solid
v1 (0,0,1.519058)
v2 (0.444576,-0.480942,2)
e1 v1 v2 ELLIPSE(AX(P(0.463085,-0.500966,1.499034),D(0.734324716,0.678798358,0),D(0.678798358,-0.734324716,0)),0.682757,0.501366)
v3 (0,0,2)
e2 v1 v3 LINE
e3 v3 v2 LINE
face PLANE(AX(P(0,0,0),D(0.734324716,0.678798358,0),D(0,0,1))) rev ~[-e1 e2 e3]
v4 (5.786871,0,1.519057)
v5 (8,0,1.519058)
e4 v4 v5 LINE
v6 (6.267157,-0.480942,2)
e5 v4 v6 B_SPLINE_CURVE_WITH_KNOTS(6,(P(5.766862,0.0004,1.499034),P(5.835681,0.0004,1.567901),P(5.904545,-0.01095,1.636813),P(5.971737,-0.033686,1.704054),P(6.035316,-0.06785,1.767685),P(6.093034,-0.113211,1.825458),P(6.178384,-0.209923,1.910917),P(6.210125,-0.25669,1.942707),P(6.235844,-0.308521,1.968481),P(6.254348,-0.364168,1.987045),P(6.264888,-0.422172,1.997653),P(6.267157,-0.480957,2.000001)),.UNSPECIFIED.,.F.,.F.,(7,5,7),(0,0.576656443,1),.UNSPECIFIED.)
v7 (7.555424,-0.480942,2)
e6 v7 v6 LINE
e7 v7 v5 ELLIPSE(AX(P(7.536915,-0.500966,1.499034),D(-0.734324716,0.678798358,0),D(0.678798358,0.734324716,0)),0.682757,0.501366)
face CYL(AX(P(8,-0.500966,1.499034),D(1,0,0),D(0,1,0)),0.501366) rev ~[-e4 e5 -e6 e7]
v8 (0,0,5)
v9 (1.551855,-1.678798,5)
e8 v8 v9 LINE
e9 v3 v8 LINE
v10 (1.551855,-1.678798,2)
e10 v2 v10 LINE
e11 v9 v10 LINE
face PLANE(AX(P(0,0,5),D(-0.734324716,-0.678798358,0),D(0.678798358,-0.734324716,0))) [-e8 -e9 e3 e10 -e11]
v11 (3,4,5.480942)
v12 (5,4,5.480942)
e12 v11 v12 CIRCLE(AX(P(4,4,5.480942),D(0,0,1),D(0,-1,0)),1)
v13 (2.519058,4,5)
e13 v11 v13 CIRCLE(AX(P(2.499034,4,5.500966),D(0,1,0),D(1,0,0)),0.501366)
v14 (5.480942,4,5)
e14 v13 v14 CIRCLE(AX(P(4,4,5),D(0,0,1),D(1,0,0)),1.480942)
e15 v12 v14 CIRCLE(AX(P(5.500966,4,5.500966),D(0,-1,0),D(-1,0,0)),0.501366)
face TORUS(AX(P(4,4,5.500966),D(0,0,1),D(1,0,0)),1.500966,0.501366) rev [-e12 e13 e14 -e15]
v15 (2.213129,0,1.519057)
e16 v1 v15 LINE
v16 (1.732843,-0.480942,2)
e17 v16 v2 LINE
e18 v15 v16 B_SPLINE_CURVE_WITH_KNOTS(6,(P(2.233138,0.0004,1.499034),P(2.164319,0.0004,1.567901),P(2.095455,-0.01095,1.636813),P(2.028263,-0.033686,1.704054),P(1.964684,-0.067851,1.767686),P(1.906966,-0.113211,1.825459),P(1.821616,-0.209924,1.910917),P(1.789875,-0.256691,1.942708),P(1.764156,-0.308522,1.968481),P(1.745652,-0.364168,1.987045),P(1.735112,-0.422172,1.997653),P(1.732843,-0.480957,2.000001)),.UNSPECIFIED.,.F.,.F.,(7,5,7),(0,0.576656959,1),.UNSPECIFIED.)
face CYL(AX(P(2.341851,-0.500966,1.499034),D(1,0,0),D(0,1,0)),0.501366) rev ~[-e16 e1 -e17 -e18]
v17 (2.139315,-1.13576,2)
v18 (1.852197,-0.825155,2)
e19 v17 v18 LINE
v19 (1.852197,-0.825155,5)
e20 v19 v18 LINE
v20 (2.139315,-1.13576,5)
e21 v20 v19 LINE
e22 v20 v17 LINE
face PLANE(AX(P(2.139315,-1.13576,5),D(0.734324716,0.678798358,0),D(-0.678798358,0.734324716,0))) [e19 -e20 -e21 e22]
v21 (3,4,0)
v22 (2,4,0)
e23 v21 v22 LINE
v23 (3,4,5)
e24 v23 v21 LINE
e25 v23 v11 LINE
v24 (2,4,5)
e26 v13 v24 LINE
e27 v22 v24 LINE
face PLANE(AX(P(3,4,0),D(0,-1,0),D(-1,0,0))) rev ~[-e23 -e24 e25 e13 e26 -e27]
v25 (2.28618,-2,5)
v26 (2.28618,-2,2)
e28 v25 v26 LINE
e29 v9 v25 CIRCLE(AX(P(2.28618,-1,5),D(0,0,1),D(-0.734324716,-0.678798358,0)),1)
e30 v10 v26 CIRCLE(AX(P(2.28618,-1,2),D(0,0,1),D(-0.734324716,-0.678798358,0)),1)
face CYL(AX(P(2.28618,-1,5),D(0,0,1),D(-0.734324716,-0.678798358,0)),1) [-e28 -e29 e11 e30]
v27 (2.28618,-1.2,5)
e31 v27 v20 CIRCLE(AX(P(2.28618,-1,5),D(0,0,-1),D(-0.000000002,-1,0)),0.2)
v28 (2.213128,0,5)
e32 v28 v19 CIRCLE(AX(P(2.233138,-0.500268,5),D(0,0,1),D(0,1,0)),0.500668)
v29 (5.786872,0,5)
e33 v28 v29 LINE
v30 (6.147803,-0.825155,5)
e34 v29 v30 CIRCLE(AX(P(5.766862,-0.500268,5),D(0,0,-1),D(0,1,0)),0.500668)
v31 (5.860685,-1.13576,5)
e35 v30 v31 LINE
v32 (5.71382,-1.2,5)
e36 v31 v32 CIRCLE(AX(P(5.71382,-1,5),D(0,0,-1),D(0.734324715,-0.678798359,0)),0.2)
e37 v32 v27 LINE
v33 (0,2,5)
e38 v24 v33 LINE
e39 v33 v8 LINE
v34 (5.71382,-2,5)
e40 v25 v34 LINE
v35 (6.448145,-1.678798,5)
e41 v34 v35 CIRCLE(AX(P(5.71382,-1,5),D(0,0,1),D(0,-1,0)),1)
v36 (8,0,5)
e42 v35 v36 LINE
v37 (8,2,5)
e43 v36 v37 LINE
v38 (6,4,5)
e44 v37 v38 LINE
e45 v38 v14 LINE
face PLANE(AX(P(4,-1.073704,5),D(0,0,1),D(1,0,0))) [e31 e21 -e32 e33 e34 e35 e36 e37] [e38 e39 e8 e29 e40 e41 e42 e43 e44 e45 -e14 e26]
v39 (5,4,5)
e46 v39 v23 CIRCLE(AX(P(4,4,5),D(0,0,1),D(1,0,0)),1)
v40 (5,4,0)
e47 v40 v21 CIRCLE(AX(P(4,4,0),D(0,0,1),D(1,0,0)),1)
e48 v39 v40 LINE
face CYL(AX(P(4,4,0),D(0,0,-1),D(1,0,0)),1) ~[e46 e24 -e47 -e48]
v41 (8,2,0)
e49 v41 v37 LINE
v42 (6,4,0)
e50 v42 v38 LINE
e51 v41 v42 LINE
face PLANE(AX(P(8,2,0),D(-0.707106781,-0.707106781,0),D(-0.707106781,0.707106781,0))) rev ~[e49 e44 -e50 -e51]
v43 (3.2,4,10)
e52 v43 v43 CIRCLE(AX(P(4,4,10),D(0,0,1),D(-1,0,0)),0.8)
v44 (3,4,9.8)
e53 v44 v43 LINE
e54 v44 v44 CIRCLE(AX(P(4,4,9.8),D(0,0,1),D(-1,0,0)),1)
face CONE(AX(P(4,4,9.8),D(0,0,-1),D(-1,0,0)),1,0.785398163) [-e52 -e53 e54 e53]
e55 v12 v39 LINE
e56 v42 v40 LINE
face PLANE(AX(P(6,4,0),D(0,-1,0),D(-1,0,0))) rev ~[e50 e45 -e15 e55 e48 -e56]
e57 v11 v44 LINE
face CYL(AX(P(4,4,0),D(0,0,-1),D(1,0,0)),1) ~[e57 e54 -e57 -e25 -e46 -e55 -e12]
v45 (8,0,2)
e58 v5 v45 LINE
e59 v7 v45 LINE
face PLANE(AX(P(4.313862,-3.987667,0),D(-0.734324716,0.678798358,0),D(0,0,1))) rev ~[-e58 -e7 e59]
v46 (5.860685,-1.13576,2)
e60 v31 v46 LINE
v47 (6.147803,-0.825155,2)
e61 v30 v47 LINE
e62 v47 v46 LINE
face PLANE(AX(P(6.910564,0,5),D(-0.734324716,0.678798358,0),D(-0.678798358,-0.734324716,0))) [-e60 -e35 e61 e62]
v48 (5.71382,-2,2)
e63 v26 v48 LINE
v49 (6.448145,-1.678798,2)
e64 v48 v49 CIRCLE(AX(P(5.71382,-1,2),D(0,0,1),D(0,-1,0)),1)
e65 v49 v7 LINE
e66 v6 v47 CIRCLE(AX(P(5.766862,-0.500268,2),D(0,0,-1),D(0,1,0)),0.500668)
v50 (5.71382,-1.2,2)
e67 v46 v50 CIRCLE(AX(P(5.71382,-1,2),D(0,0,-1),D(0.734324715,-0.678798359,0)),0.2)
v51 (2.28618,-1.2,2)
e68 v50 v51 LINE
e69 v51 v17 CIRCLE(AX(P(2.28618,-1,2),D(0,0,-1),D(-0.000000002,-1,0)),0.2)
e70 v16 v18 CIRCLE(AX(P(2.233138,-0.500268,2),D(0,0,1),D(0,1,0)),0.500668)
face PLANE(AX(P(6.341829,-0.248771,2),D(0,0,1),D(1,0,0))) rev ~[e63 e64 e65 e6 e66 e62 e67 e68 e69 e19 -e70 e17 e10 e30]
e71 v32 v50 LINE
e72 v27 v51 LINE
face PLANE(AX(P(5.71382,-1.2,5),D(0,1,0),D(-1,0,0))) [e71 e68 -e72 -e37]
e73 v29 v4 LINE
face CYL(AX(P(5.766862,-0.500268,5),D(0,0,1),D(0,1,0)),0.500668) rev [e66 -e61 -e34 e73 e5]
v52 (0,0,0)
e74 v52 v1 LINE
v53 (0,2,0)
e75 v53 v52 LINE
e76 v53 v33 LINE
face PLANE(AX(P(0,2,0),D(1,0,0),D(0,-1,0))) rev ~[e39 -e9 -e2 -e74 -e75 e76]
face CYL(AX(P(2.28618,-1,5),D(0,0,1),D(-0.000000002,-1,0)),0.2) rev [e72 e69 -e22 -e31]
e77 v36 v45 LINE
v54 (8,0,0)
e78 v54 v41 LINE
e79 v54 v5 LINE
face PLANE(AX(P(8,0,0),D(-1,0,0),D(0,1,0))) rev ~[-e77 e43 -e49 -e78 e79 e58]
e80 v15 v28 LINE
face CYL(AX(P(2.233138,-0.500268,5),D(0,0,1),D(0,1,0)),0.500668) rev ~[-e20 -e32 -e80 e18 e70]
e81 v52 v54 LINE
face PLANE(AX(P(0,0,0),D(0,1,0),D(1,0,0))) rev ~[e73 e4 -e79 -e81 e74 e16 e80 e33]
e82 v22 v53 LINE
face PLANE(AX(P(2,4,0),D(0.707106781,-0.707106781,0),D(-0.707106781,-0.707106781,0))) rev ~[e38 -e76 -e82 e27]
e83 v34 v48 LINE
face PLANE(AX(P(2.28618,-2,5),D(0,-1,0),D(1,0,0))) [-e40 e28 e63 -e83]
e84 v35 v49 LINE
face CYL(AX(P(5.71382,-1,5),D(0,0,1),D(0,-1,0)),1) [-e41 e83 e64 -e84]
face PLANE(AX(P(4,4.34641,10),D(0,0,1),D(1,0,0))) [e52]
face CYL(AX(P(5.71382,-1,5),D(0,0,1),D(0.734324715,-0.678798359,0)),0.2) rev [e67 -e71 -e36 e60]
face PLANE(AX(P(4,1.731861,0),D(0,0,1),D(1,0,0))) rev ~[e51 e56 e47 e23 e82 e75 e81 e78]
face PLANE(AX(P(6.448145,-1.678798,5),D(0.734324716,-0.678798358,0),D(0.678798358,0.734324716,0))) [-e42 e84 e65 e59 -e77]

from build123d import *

# Parameters (mm, degrees)
F1_DEPTH     = 5
F2_DEPTH     = 10
F3_SIZE      = 0.2
F5_DEPTH     = 3
F6_T1_DEPTH  = 3
F6_T6_DEPTH  = 2.3418509092
F6_T12_DEPTH = 2.3418509092
F6_T16_ANGLE = 180
F6_T21_DEPTH = 2.3418509092
F6_T25_DEPTH = 5.8592538582
F6_T33_DEPTH = 5.8592538582
F6_T38_DEPTH = 2.3418509092


# Not quite as in the source:
# - a fillet or chamfer that OpenCascade refuses, or shapes differently, is made with other operations: its cross-section is extruded or revolved along the edge and cut away or added


with BuildPart() as f1:
    # F0 (on Top) → F1 (new body)
    with BuildSketch(Plane.XY):
        with BuildLine():
            Line((0, 2), (0, 0))
            Line((0, 0), (8, 0))
            Line((8, 0), (8, 2))
            Line((8, 2), (6, 4))
            Line((6, 4), (5, 4))
            ThreePointArc((5, 4), (4, 3), (3, 4))
            Line((3, 4), (2, 4))
            Line((2, 4), (0, 2))
        make_face()
        with BuildLine():
            ThreePointArc((5, 4), (4, 5), (3, 4))
            Line((3, 4), (5, 4))
        make_face()
        with BuildLine():
            Line((5, 4), (3, 4))
            ThreePointArc((3, 4), (4, 3), (5, 4))
        make_face()
    extrude(amount=F1_DEPTH)

    # F0 (on Top) → F2 (join)
    with BuildSketch(Plane.XY):
        with BuildLine():
            ThreePointArc((5, 4), (4, 5), (3, 4))
            Line((3, 4), (5, 4))
        make_face()
        with BuildLine():
            Line((5, 4), (3, 4))
            ThreePointArc((3, 4), (4, 3), (5, 4))
        make_face()
    extrude(amount=F2_DEPTH)

    # F3
    f3_edges = [f1.edges().sort_by_distance(p)[0] for p in [
        (5, 4, 10),
    ]]
    chamfer(f3_edges, length=F3_SIZE)

    # F4 (on face) → F5 (join)
    with BuildSketch(Plane.XY.offset(5)):
        with BuildLine():
            Line((1.0894362964, 0), (0, 0))
            Line((0, 0), (1.5518551177, -1.6787983581))
            ThreePointArc((1.5518551177, -1.6787983581), (1.8854295116, -1.9161873057), (2.286179834, -2))
            Line((2.286179834, -2), (5.713820166, -2))
            ThreePointArc((5.713820166, -2), (6.1145704884, -1.9161873057), (6.4481448823, -1.6787983581))
            Line((6.4481448823, -1.6787983581), (8, 0))
            Line((8, 0), (6.9105637036, 0))
            Line((6.9105637036, 0), (5.8606851097, -1.1357596721))
            ThreePointArc((5.8606851097, -1.1357596721), (5.7939702307, -1.1832374617), (5.713820166, -1.2000000007))
            Line((5.713820166, -1.2000000007), (2.286179834, -1.2000000007))
            ThreePointArc((2.286179834, -1.2000000007), (2.2060297693, -1.1832374617), (2.1393148903, -1.1357596721))
            Line((2.1393148903, -1.1357596721), (1.0894362964, 0))
        make_face()
    extrude(amount=-F5_DEPTH)

    # F6: fillet of radius 0.5 on 5 edges, made by hand

    # F6_s2 → F6_t1 (join)
    with BuildSketch(Plane.XY.offset(2)):
        with BuildLine():
            ThreePointArc((5.7668622302, 0.0004), (6.2255674394, -0.2996248388), (6.1345147512, -0.8401197793))
            Line((6.1345147512, -0.8401197793), (6.1712800033, -0.8741050071))
            ThreePointArc((6.1712800033, -0.8741050071), (6.5591576145, -0.4539093578), (6.9473289557, -0.0339852278))
            Line((6.9473289557, -0.0339852278), (6.9105637036, 0.0500667501))
            ThreePointArc((6.9105637036, 0.0500667501), (6.3387129669, 0.0500667501), (5.7668622302, 0.0504667501))
            Line((5.7668622302, 0.0504667501), (5.7668622302, 0.0004))
        make_face()
        with BuildLine():
            ThreePointArc((2.2331377698, 0.0004), (1.7744325606, -0.2996248388), (1.8654852488, -0.8401197793))
            Line((1.8654852488, -0.8401197793), (1.8287199967, -0.8741050071))
            ThreePointArc((1.8287199967, -0.8741050071), (1.4408423855, -0.4539093578), (1.0526710443, -0.0339852278))
            Line((1.0526710443, -0.0339852278), (1.0894362964, 0.0500667501))
            ThreePointArc((1.0894362964, 0.0500667501), (1.6612870331, 0.0500667501), (2.2331377698, 0.0504667501))
            Line((2.2331377698, 0.0504667501), (2.2331377698, 0.0004))
        make_face()
    extrude(amount=F6_T1_DEPTH)


with BuildPart() as f6_tool4:
    # F6_s5 → F6_t6 (new body)
    with BuildSketch(Plane.YZ.offset(8)):
        with BuildLine():
            ThreePointArc((0.0004, 1.4990343146), (-0.1464466094, 1.8535533906), (-0.5009656854, 2.0004))
            Line((-0.5009656854, 2.0004), (-0.5009656854, 2.0505365685))
            ThreePointArc((-0.5009656854, 2.0505365685), (-0.2504828427, 2.0501365685), (0, 2.0501365685))
            Line((0, 2.0501365685), (0.0501365685, 2))
            ThreePointArc((0.0501365685, 2), (0.0501365685, 1.7495171573), (0.0505365685, 1.4990343146))
            Line((0.0505365685, 1.4990343146), (0.0004, 1.4990343146))
        make_face()
    extrude(amount=-F6_T6_DEPTH)

    split(bisect_by=Plane(origin=(4.3138623121, -3.9876672942, 0), x_dir=(0, 0, 1), z_dir=(-0.7343247163, 0.6787983581, 0)), keep=Keep.TOP)

    split(bisect_by=Plane(origin=(3.7264025395, -3.4446286081, 0), x_dir=(0, 0, 1), z_dir=(0.7343247163, -0.6787983581, 0)), keep=Keep.TOP)


with BuildPart() as f1_1:
    add(f1.part)

    # F6_t3: union F6_tool4
    add(f6_tool4.part)


with BuildPart() as f6_tool10:
    # F6_s11 → F6_t12 (new body)
    with BuildSketch(Plane.YZ.offset(2.3418509092)):
        with BuildLine():
            ThreePointArc((0.0004, 1.4990343146), (-0.1464466094, 1.8535533906), (-0.5009656854, 2.0004))
            Line((-0.5009656854, 2.0004), (-0.5009656854, 2.0505365685))
            ThreePointArc((-0.5009656854, 2.0505365685), (-0.2504828427, 2.0501365685), (0, 2.0501365685))
            Line((0, 2.0501365685), (0.0501365685, 2))
            ThreePointArc((0.0501365685, 2), (0.0501365685, 1.7495171573), (0.0505365685, 1.4990343146))
            Line((0.0505365685, 1.4990343146), (0.0004, 1.4990343146))
        make_face()
    extrude(amount=-F6_T12_DEPTH)

    split(bisect_by=Plane(origin=(0, 0, 0), x_dir=(0, 0, 1), z_dir=(0.7343247163, 0.6787983581, 0)), keep=Keep.TOP)

    split(bisect_by=Plane(origin=(0.5874597726, 0.543038686, 0), x_dir=(0, 0, 1), z_dir=(-0.7343247163, -0.6787983581, 0)), keep=Keep.TOP)


with BuildPart() as f1_2:
    add(f1_1.part)

    # F6_t9: union F6_tool10
    add(f6_tool10.part)

    # F6_s15 → F6_t16 (revolve)
    with BuildSketch(Plane.XZ.offset(-4)):
        with BuildLine():
            ThreePointArc((4.9996, 5.5009656854), (5.1464466094, 5.1464466094), (5.5009656854, 4.9996))
            Line((5.5009656854, 4.9996), (5.5009656854, 4.9494634315))
            ThreePointArc((5.5009656854, 4.9494634315), (5.2504828427, 4.9498634315), (5, 4.9498634315))
            Line((5, 4.9498634315), (4.9498634315, 5))
            ThreePointArc((4.9498634315, 5), (4.9498634315, 5.2504828427), (4.9494634315, 5.5009656854))
            Line((4.9494634315, 5.5009656854), (4.9996, 5.5009656854))
        make_face()
    revolve(axis=Axis((4, 4, 5), (0, 0, -1)), revolution_arc=F6_T16_ANGLE)


with BuildPart() as f6_tool19:
    # F6_s20 → F6_t21 (new body)
    with BuildSketch(Plane.YZ.offset(8)):
        with BuildLine():
            ThreePointArc((0.0004, 1.4990343146), (-0.1464466094, 1.8535533906), (-0.5009656854, 2.0004))
            Line((-0.5009656854, 2.0004), (-0.5009656854, 2.0505365685))
            ThreePointArc((-0.5009656854, 2.0505365685), (-0.2504828427, 2.0501365685), (0, 2.0501365685))
            Line((0, 2.0501365685), (0.0501365685, 2))
            ThreePointArc((0.0501365685, 2), (0.0501365685, 1.7495171573), (0.0505365685, 1.4990343146))
            Line((0.0505365685, 1.4990343146), (0.0004, 1.4990343146))
        make_face()
    extrude(amount=-F6_T21_DEPTH)

    split(bisect_by=Plane(origin=(3.7264025395, -3.4446286081, 0), x_dir=(0, 0, 1), z_dir=(-0.7343247163, 0.6787983581, 0)), keep=Keep.TOP)


with BuildPart() as f6_tool23:
    # F6_s24 → F6_t25 (new body)
    with BuildSketch(Plane.XY.offset(5)):
        with BuildLine():
            ThreePointArc((5.7668622302, 0.0004), (6.2255674394, -0.2996248388), (6.1345147512, -0.8401197793))
            Line((6.1345147512, -0.8401197793), (6.1712800033, -0.8741050071))
            ThreePointArc((6.1712800033, -0.8741050071), (6.5591576145, -0.4539093578), (6.9473289557, -0.0339852278))
            Line((6.9473289557, -0.0339852278), (6.9105637036, 0.0500667501))
            ThreePointArc((6.9105637036, 0.0500667501), (6.3387129669, 0.0500667501), (5.7668622302, 0.0504667501))
            Line((5.7668622302, 0.0504667501), (5.7668622302, 0.0004))
        make_face()
    extrude(amount=-F6_T25_DEPTH)

    split(bisect_by=Plane.XY, keep=Keep.TOP)

    split(bisect_by=Plane.XY.offset(2), keep=Keep.BOTTOM)


with BuildPart() as f6_tool19_1:
    add(f6_tool19.part)

    # F6_t28: intersect F6_tool23
    add(f6_tool23.part, mode=Mode.INTERSECT)


with BuildPart() as f1_3:
    add(f1_2.part)

    # F6_t17: union F6_tool19
    add(f6_tool19_1.part)


with BuildPart() as f6_tool31:
    # F6_s32 → F6_t33 (new body)
    with BuildSketch(Plane.XY.offset(5)):
        with BuildLine():
            ThreePointArc((2.2331377698, 0.0004), (1.7744325606, -0.2996248388), (1.8654852488, -0.8401197793))
            Line((1.8654852488, -0.8401197793), (1.8287199967, -0.8741050071))
            ThreePointArc((1.8287199967, -0.8741050071), (1.4408423855, -0.4539093578), (1.0526710443, -0.0339852278))
            Line((1.0526710443, -0.0339852278), (1.0894362964, 0.0500667501))
            ThreePointArc((1.0894362964, 0.0500667501), (1.6612870331, 0.0500667501), (2.2331377698, 0.0504667501))
            Line((2.2331377698, 0.0504667501), (2.2331377698, 0.0004))
        make_face()
    extrude(amount=-F6_T33_DEPTH)

    split(bisect_by=Plane.XY, keep=Keep.TOP)

    split(bisect_by=Plane.XY.offset(2), keep=Keep.BOTTOM)


with BuildPart() as f6_tool36:
    # F6_s37 → F6_t38 (new body)
    with BuildSketch(Plane.YZ.offset(2.3418509092)):
        with BuildLine():
            ThreePointArc((0.0004, 1.4990343146), (-0.1464466094, 1.8535533906), (-0.5009656854, 2.0004))
            Line((-0.5009656854, 2.0004), (-0.5009656854, 2.0505365685))
            ThreePointArc((-0.5009656854, 2.0505365685), (-0.2504828427, 2.0501365685), (0, 2.0501365685))
            Line((0, 2.0501365685), (0.0501365685, 2))
            ThreePointArc((0.0501365685, 2), (0.0501365685, 1.7495171573), (0.0505365685, 1.4990343146))
            Line((0.0505365685, 1.4990343146), (0.0004, 1.4990343146))
        make_face()
    extrude(amount=-F6_T38_DEPTH)

    split(bisect_by=Plane(origin=(0.5874597726, 0.543038686, 0), x_dir=(0, 0, 1), z_dir=(0.7343247163, 0.6787983581, 0)), keep=Keep.TOP)


with BuildPart() as f6_tool31_1:
    add(f6_tool31.part)

    # F6_t40: intersect F6_tool36
    add(f6_tool36.part, mode=Mode.INTERSECT)


with BuildPart() as f1_4:
    add(f1_3.part)

    # F6_t29: union F6_tool31
    add(f6_tool31_1.part)


solid = f1_4.part
